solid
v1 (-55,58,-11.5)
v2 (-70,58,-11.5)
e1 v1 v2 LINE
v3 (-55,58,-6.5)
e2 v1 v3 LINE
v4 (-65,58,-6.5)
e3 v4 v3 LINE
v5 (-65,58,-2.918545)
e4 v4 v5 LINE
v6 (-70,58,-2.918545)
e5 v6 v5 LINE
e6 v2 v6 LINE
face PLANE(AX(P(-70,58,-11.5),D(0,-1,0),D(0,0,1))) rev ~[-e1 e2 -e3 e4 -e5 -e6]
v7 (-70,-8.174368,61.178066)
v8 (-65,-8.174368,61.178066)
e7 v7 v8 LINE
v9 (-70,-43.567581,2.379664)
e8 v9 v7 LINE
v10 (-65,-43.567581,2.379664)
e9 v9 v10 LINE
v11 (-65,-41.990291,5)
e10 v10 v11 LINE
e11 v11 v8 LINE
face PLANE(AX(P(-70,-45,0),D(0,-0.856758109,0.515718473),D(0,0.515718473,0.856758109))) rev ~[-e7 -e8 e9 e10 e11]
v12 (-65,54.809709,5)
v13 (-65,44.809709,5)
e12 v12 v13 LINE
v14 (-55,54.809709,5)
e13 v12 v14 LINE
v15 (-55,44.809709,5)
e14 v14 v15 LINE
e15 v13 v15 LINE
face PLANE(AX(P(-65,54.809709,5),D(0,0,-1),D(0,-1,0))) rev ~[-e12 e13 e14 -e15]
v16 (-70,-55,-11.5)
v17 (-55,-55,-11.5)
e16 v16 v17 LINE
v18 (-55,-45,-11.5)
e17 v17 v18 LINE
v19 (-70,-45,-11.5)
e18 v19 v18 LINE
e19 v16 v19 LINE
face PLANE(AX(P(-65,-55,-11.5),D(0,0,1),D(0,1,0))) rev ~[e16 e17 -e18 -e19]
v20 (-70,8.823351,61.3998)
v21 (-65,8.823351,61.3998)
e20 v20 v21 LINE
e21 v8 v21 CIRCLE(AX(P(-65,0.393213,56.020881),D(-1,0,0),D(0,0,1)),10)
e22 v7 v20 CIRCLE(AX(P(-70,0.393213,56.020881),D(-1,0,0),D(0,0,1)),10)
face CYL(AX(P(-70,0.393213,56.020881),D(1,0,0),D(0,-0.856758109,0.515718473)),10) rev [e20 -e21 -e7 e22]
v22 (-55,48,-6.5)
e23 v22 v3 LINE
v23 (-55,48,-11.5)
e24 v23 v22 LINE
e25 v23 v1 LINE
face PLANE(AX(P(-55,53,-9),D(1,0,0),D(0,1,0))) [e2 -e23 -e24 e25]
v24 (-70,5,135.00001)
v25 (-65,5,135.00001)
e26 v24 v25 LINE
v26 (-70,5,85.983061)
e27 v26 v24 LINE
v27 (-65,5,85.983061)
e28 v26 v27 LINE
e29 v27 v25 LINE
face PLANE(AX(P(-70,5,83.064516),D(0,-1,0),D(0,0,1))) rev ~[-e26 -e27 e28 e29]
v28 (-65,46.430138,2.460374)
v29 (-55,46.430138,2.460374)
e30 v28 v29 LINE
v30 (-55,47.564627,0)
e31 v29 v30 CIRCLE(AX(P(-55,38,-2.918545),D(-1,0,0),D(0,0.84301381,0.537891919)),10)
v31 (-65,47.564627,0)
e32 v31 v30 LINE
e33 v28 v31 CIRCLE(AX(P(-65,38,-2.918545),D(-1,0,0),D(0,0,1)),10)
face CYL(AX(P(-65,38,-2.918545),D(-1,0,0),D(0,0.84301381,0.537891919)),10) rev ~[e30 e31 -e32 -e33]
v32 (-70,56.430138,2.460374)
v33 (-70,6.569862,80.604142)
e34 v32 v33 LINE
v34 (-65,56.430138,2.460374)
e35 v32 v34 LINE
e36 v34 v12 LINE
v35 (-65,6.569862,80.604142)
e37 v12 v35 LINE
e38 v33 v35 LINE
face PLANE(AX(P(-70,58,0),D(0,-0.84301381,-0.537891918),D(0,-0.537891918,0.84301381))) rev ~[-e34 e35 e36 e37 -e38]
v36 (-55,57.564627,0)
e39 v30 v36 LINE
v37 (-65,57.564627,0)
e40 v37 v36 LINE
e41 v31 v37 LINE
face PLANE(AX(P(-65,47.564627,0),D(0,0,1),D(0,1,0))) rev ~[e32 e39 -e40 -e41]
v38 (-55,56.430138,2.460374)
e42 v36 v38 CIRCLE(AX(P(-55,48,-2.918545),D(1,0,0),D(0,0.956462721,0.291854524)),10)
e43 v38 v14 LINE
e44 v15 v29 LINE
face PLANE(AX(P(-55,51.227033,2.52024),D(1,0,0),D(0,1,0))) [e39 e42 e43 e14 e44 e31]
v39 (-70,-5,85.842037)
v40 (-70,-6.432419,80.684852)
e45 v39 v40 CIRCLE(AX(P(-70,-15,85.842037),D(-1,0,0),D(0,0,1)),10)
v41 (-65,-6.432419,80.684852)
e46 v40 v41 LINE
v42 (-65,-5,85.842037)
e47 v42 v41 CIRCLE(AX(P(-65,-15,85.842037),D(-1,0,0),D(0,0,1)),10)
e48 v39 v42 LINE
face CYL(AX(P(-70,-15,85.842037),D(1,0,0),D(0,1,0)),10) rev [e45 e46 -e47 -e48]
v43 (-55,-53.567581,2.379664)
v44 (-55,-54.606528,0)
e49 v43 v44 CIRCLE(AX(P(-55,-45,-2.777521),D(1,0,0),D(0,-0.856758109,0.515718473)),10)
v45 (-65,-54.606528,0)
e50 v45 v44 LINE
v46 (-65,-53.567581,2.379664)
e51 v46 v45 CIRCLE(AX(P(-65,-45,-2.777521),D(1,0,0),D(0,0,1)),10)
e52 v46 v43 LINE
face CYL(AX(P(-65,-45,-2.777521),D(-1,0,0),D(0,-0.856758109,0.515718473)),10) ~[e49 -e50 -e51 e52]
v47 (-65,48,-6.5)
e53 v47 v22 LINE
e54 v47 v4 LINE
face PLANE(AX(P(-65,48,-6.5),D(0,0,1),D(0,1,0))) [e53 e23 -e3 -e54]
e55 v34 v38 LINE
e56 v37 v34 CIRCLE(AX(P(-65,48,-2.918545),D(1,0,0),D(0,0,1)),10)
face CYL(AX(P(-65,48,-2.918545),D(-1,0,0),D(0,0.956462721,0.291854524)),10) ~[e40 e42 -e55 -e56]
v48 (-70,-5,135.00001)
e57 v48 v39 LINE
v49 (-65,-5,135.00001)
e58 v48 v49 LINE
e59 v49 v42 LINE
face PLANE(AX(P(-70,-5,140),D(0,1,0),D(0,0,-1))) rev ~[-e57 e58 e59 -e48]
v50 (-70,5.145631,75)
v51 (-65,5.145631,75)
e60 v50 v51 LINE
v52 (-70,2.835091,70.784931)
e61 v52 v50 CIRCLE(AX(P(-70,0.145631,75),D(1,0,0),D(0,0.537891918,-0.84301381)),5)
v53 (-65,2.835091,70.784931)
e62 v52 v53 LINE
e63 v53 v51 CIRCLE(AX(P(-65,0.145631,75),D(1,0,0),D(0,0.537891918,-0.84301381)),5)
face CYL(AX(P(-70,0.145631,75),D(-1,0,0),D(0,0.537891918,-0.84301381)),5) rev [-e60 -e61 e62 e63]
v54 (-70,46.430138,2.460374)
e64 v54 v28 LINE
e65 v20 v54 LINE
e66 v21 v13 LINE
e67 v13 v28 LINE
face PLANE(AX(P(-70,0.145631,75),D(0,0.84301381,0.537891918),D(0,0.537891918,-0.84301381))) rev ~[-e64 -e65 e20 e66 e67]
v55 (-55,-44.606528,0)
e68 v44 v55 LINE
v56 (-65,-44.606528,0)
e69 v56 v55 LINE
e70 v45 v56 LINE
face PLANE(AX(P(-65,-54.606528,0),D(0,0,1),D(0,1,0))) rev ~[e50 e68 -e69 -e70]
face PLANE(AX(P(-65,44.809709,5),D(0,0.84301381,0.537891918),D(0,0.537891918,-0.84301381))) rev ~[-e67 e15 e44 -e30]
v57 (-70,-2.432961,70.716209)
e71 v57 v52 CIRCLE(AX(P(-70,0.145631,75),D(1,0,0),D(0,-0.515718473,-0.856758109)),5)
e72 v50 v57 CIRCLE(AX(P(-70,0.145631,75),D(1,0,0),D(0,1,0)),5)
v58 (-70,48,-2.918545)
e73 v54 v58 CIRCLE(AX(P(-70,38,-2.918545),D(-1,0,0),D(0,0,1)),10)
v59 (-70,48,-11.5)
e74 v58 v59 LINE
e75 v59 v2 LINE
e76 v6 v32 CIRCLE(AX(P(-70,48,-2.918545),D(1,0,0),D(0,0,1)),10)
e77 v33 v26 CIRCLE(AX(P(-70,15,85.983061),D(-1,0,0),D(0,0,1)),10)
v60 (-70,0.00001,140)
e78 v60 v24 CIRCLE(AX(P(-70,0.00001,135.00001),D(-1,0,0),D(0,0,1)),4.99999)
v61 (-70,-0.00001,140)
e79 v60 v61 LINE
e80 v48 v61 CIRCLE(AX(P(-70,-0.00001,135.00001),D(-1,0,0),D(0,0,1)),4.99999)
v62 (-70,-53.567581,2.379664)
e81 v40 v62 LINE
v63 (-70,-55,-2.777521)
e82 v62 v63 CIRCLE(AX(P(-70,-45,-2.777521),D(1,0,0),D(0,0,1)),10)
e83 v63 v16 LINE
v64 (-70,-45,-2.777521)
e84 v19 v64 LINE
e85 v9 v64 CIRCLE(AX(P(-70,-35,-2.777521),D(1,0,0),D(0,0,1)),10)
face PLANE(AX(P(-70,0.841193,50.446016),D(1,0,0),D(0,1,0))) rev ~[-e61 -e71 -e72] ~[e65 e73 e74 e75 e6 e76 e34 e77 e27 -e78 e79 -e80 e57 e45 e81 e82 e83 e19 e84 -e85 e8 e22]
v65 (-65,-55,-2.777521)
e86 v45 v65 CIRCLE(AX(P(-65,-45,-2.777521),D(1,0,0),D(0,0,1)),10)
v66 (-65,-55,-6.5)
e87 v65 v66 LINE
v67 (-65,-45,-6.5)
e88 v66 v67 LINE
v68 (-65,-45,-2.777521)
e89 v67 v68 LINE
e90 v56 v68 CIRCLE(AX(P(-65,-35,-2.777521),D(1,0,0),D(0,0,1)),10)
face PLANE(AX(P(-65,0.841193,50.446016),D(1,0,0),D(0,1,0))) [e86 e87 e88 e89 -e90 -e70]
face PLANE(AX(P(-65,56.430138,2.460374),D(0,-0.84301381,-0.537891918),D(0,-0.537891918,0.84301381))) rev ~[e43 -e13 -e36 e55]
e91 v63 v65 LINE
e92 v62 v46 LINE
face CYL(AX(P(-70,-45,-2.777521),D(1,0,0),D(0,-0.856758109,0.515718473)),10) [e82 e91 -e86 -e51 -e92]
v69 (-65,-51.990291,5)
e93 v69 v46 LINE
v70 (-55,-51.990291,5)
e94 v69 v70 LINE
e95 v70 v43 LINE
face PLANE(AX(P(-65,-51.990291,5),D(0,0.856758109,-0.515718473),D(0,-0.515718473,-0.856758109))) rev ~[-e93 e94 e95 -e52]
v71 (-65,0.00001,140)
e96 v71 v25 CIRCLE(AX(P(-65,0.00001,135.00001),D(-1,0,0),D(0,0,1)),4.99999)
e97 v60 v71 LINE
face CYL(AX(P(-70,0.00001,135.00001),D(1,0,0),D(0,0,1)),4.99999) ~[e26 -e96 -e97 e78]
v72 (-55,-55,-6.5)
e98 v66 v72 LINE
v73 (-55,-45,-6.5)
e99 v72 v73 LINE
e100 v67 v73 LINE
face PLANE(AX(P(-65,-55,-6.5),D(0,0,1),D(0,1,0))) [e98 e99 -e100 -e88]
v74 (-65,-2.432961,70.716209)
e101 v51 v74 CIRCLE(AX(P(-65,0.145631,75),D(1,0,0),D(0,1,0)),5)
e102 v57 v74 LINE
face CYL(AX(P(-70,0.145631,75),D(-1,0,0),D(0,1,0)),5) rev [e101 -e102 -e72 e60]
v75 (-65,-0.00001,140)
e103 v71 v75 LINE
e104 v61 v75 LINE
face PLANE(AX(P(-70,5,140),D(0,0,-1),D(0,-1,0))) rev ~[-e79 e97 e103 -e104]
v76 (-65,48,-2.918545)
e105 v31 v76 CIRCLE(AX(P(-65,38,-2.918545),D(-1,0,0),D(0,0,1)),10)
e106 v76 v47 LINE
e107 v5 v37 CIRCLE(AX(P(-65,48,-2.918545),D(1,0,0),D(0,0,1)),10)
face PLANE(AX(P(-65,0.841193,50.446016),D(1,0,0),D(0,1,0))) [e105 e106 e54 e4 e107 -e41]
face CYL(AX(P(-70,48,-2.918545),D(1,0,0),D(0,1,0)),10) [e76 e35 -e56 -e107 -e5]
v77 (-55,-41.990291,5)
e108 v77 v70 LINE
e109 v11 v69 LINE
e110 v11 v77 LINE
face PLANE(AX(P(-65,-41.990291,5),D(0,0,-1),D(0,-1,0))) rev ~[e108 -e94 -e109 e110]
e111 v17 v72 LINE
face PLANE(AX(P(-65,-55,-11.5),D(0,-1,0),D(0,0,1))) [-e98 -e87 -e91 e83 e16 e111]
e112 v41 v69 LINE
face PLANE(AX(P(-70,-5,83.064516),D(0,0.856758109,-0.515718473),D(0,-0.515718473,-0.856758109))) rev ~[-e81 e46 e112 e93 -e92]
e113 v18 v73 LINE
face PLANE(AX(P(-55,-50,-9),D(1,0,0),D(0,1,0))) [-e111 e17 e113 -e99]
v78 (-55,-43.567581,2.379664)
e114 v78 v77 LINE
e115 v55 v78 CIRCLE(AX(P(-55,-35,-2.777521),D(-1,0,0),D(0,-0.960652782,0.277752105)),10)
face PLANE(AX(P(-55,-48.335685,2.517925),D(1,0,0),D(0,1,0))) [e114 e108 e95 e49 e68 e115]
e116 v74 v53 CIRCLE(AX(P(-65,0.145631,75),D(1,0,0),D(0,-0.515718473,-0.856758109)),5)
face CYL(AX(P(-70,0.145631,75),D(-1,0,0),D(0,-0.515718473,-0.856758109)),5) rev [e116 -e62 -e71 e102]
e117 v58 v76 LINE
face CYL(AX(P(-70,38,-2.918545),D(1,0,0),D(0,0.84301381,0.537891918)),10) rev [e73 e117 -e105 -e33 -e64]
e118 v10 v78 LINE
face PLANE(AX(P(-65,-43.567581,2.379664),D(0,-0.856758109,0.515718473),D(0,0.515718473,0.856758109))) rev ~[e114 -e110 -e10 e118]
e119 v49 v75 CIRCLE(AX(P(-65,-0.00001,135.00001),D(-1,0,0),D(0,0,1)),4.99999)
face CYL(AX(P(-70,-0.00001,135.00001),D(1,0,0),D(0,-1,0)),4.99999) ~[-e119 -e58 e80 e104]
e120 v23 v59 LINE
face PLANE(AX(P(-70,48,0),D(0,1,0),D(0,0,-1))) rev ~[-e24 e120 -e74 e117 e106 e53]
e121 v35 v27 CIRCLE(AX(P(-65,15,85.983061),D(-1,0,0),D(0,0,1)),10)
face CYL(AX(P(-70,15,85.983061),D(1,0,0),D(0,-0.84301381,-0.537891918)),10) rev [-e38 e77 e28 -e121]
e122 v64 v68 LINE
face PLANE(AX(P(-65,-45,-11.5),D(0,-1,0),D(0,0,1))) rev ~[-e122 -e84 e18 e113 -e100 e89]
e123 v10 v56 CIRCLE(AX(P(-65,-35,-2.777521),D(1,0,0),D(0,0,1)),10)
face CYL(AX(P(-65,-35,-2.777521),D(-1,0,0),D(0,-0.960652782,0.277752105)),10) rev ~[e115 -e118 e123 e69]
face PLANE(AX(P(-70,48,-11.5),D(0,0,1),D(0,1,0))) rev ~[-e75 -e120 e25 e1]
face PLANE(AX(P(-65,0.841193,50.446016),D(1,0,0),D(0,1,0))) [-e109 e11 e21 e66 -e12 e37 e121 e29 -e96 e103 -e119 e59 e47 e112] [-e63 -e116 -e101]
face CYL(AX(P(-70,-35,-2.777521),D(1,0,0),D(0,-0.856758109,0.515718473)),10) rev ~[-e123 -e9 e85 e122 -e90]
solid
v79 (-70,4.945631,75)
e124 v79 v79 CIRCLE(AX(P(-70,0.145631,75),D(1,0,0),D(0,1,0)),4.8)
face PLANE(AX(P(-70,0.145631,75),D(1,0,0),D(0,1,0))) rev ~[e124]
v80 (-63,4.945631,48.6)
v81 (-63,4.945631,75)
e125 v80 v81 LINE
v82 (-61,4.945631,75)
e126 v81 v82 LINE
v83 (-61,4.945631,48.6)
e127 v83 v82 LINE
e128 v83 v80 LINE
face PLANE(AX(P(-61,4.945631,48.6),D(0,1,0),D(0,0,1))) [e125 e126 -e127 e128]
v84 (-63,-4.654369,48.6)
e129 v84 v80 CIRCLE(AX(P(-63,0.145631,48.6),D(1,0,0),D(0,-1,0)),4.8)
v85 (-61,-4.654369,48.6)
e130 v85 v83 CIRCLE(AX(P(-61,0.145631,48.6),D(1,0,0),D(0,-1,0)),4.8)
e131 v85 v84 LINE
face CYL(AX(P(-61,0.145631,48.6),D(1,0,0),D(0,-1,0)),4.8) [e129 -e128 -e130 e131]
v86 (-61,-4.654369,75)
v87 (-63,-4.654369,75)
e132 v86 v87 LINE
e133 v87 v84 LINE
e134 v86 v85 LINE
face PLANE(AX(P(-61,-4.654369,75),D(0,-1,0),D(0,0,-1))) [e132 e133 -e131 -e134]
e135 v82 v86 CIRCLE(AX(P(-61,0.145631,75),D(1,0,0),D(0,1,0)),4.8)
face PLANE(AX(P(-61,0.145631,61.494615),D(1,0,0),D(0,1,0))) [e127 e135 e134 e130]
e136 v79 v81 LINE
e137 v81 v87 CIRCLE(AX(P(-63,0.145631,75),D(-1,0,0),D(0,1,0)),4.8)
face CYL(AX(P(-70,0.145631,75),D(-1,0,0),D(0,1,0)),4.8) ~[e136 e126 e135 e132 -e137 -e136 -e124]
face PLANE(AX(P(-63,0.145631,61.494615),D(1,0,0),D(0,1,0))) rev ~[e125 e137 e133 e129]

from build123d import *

# Parameters (mm, degrees)
F2_DEPTH  = 5
F3_R      = 10
F4_R      = 4.99999
F5_W      = 10
F5_H      = 5
F6_DEPTH  = 10
F8_DEPTH  = 5
F9_R      = 4.8
F10_DEPTH = 9
F12_DEPTH = 2


# Not quite as in the source:
# - a fillet or chamfer is up to 0.001 mm smaller than in the source, because OpenCascade refuses the exact size


with BuildPart() as f2:
    # F1 (on offset) → F2 (new body)
    with BuildSketch(Plane.YZ.offset(-70)):
        Polygon((-45, 0), (0.145631068, 75), (48, 0), (48, -11.5), (58, -11.5), (58, 0), (5, 83.064516129), (5, 140), (0, 140), (-5, 140), (-5, 83.064516129), (-55, 0), (-55, -11.5), (-45, -11.5), align=None)
    extrude(amount=F2_DEPTH)

    # F3
    f3_edges = [f2.edges().sort_by_distance(p)[0] for p in [
        (-67.5, -55, 0),
        (-67.5, 48, 0),
        (-67.5, 0.145631, 75),
        (-67.5, 5, 83.064516),
        (-67.5, -5, 83.064516),
        (-67.5, 58, 0),
        (-67.5, -45, 0),
    ]]
    fillet(f3_edges, radius=F3_R)

    # F4 (radius 5 in the source; OpenCascade refuses exactly that, so slightly less here)
    f4_edges = [f2.edges().sort_by_distance(p)[0] for p in [
        (-67.5, -5, 140),
        (-67.5, 5, 140),
    ]]
    fillet(f4_edges, radius=F4_R)

    # F5 (on face) → F6 (join)
    with BuildSketch(Plane.YZ.offset(-65)):
        with Locations((-50, -9)):
            Rectangle(F5_W, F5_H)
        with Locations((53, -9)):
            Rectangle(F5_W, F5_H)
        with BuildLine():
            ThreePointArc((-53.5675810852, 2.379663681), (-54.16461993, 1.2236964571), (-54.6065278232, 0))
            Line((-54.6065278232, 0), (-44.6065278232, 0))
            ThreePointArc((-44.6065278232, 0), (-44.16461993, 1.2236964571), (-43.5675810852, 2.379663681))
            Line((-43.5675810852, 2.379663681), (-41.9902912621, 5))
            Line((-41.9902912621, 5), (-51.9902912621, 5))
            Line((-51.9902912621, 5), (-53.5675810852, 2.379663681))
        make_face()
        with BuildLine():
            Line((54.8097087379, 5), (44.8097087379, 5))
            Line((44.8097087379, 5), (46.4301381012, 2.4603739436))
            ThreePointArc((46.4301381012, 2.4603739436), (47.0810932515, 1.2687862909), (47.5646272105, 0))
            Line((47.5646272105, 0), (57.5646272105, 0))
            ThreePointArc((57.5646272105, 0), (57.0810932515, 1.2687862909), (56.4301381012, 2.4603739436))
            Line((56.4301381012, 2.4603739436), (54.8097087379, 5))
        make_face()
    extrude(amount=F6_DEPTH)

    # F7 (on face) → F8 (cut, through all)
    with BuildSketch(Plane.YZ.offset(-70)):
        with BuildLine():
            ThreePointArc((2.8350906603, 70.7849309494), (4.5301092559, 72.5965959517), (5.145631068, 75))
            ThreePointArc((5.145631068, 75), (-2.3147589593, 79.3527555541), (-2.4329612975, 70.7162094574))
            Line((-2.4329612975, 70.7162094574), (0.145631068, 75))
            Line((0.145631068, 75), (2.8350906603, 70.7849309494))
        make_face()
        with BuildLine():
            Line((0.145631068, 75), (-2.4329612975, 70.7162094574))
            ThreePointArc((-2.4329612975, 70.7162094574), (0.2108502857, 70.0004253727), (2.8350906603, 70.7849309494))
            Line((2.8350906603, 70.7849309494), (0.145631068, 75))
        make_face()
    extrude(amount=F8_DEPTH, mode=Mode.SUBTRACT)


with BuildPart() as f10:
    # F9 (on face) → F10 (new body)
    with BuildSketch(Plane.YZ.offset(-70)):
        with Locations((0.145631068, 75)):
            Circle(F9_R)
    extrude(amount=F10_DEPTH)

    # F11 (on face) → F12 (join)
    with BuildSketch(Plane.YZ.offset(-61)):
        with BuildLine():
            Line((4.945631068, 75), (-4.654368932, 75))
            Line((-4.654368932, 75), (-4.654368932, 48.6))
            ThreePointArc((-4.654368932, 48.6), (0.145631068, 53.4), (4.945631068, 48.6))
            Line((4.945631068, 48.6), (4.945631068, 75))
        make_face()
        with BuildLine():
            ThreePointArc((4.945631068, 48.6), (0.145631068, 53.4), (-4.654368932, 48.6))
            Line((-4.654368932, 48.6), (4.945631068, 48.6))
        make_face()
        with BuildLine():
            Line((4.945631068, 48.6), (-4.654368932, 48.6))
            ThreePointArc((-4.654368932, 48.6), (0.145631068, 43.8), (4.945631068, 48.6))
        make_face()
        with BuildLine():
            ThreePointArc((4.945631068, 75), (0.145631068, 79.8), (-4.654368932, 75))
            Line((-4.654368932, 75), (4.945631068, 75))
        make_face()
    extrude(amount=-F12_DEPTH)


solid = Compound([f2.part, f10.part])
